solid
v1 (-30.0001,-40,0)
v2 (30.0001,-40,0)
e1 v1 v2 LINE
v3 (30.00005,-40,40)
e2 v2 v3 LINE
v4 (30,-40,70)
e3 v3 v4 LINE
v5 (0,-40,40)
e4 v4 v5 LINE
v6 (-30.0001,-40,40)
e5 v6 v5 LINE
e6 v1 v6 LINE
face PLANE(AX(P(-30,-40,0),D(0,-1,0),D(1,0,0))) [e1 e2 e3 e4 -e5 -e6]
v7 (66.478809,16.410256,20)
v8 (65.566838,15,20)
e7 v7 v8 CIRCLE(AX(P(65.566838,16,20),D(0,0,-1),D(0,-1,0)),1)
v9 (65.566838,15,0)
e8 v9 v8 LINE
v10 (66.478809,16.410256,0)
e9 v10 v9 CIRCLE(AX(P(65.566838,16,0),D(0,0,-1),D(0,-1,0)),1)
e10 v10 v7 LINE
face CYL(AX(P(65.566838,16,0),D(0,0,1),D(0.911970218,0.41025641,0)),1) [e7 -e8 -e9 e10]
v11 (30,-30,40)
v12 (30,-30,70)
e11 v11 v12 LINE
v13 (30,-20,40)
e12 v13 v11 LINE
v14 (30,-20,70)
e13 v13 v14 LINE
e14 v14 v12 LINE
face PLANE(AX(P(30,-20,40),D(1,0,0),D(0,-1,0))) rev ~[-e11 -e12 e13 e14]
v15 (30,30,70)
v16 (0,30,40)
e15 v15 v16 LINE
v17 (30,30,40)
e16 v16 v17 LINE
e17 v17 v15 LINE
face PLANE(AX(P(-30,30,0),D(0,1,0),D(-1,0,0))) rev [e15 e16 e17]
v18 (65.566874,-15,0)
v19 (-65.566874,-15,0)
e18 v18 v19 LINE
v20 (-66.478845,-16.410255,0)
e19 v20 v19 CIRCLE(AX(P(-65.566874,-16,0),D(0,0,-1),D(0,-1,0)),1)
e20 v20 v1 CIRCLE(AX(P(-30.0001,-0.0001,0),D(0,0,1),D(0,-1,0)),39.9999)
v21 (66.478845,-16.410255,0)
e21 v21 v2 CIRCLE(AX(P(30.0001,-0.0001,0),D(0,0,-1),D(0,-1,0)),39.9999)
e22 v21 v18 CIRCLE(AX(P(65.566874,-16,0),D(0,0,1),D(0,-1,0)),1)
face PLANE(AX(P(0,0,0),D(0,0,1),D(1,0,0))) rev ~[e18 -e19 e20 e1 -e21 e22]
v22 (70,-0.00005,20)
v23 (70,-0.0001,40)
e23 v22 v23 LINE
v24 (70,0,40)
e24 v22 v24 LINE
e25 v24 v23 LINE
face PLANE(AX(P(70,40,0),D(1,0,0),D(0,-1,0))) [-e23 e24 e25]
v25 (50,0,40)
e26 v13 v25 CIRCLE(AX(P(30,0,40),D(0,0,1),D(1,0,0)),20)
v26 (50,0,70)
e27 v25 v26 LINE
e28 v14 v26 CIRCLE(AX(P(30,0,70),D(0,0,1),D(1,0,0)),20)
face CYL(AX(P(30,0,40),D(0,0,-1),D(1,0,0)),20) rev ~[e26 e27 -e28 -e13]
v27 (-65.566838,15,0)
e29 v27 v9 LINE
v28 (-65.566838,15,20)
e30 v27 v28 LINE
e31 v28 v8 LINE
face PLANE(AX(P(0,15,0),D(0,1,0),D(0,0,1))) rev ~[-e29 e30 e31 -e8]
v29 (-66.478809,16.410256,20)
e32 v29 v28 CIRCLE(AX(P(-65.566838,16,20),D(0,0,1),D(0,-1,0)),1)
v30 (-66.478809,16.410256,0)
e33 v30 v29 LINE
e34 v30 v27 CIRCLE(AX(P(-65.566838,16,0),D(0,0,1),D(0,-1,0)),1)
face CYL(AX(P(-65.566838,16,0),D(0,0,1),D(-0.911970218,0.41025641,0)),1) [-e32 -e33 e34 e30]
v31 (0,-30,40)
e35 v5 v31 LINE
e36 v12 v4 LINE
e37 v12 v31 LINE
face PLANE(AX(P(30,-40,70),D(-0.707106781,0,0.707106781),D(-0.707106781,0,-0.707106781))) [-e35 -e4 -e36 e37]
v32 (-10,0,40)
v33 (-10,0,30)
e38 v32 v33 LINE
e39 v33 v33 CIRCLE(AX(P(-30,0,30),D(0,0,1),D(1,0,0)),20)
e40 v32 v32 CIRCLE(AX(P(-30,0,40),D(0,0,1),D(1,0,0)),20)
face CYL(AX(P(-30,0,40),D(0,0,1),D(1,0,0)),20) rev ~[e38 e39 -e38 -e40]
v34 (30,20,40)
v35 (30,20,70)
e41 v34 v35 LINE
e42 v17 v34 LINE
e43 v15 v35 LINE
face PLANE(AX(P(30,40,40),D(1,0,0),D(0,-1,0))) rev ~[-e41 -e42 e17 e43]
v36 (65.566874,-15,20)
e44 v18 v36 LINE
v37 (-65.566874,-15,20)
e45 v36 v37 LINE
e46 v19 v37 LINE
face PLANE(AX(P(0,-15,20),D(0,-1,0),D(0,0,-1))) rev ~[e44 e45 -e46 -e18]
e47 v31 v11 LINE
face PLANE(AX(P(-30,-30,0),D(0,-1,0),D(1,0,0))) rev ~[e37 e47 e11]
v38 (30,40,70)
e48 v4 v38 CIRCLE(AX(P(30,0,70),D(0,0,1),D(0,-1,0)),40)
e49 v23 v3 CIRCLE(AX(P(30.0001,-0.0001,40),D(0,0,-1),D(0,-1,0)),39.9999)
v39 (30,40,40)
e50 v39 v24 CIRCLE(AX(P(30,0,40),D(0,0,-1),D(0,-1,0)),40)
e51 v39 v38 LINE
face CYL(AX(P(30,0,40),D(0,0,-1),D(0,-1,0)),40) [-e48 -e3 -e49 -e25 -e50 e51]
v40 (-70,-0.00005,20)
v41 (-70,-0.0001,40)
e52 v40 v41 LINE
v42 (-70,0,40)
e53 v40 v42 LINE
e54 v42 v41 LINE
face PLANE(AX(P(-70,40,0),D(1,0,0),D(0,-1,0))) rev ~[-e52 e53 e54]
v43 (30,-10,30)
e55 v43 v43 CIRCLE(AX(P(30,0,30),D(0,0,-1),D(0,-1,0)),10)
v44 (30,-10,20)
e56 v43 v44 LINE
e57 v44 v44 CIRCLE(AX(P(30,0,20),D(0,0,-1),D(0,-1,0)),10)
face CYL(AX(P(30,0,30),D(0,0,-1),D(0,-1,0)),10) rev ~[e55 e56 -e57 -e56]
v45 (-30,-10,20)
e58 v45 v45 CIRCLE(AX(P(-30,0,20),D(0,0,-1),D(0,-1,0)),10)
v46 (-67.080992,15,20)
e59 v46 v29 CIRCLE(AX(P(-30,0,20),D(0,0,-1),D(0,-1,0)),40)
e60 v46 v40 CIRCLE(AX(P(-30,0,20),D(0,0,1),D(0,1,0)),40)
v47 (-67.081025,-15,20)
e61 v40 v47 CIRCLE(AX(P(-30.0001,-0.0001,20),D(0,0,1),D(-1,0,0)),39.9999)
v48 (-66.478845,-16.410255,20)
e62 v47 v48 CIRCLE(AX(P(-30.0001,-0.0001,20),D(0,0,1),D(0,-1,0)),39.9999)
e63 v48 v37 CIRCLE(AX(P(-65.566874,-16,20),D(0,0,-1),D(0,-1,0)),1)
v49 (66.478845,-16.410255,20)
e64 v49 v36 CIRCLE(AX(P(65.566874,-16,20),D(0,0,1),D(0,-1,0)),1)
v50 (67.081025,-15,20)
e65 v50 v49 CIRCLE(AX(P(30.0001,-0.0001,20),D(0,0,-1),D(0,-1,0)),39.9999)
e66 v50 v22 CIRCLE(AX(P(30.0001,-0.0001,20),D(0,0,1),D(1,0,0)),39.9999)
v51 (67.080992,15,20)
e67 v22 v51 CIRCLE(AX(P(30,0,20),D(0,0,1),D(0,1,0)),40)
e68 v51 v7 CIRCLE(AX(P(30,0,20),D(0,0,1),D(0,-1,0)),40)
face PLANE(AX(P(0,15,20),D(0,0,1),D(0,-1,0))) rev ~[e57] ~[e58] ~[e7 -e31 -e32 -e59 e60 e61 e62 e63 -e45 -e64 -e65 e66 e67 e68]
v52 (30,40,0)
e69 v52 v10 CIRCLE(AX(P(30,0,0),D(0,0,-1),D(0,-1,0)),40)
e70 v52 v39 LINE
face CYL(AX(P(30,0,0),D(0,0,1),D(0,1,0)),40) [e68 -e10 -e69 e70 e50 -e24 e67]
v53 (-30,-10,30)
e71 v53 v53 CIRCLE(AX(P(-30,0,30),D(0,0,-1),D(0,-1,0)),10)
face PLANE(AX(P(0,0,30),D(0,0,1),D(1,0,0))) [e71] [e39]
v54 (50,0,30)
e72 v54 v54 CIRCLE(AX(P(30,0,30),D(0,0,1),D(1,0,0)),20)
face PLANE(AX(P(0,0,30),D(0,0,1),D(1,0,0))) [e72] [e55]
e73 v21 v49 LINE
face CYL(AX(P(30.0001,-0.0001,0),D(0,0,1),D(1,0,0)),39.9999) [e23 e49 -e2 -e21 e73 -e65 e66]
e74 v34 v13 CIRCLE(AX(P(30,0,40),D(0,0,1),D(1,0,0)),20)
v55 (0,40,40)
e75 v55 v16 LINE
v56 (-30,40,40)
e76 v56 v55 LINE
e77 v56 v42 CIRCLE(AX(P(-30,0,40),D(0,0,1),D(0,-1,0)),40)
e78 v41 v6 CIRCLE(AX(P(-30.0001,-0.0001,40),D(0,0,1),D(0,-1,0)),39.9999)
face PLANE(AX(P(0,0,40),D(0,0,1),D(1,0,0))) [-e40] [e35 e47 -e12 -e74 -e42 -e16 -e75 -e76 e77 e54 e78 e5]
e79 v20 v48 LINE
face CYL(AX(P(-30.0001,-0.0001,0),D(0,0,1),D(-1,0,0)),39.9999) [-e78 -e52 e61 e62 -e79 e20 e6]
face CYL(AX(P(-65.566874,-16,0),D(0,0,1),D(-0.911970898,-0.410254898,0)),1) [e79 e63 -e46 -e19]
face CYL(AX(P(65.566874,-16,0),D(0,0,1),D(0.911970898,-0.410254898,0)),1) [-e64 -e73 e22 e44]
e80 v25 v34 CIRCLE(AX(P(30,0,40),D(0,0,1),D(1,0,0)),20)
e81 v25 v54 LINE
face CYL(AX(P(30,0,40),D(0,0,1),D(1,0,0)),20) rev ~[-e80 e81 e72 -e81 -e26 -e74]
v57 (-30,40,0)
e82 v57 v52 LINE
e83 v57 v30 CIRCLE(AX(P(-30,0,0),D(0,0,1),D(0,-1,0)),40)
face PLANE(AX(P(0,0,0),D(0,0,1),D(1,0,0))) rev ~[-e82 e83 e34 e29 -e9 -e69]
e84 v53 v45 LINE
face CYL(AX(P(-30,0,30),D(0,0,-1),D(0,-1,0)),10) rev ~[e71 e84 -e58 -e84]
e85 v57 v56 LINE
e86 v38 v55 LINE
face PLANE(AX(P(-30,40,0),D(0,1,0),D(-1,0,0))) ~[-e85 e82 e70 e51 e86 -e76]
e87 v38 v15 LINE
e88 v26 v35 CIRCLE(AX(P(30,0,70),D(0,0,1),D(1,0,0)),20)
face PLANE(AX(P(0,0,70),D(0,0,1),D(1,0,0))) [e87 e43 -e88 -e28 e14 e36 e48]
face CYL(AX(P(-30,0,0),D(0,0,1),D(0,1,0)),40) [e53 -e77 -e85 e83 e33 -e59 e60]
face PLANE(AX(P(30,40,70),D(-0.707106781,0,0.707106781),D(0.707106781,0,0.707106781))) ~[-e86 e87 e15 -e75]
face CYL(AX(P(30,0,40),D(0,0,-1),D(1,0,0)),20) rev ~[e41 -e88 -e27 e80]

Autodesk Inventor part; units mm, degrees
ref_plane "XY Plane" through (0, 0, 0) normal (0, 0, 1) x (1, 0, 0)
sketch "Skizze1" plane through (0, 0, 0) normal (0, 0, 1) x (1, 0, 0)
  line L0 (-70, 0) -> (70, 0) construction
  line L1 (-70, 40) -> (70, 40)
  line L2 (-70, -40) -> (70, -40)
  line L3 (-70, 40) -> (-70, -40)
  line L4 (70, 40) -> (70, -40)
  line L5 (0, 0) -> (0, 9.5703) construction
  dimension "d0" = 80
  dimension "d1" = 140
extrude "Extrusion1" add sketch "Skizze1" along normal blind 40
fillet "Rundung1" radius 40 1 edges at (-70, 40, 20)
fillet "Rundung2" radius 40 1 edges at (-70, -40, 20)
fillet "Rundung3" radius 40 1 edges at (70, 40, 20)
fillet "Rundung4" radius 40 1 edges at (70, -40, 20)
sketch "Skizze4" plane through (0, 0, 40) normal (0, 0, 1) x (1, 0, 0)
  circle A0 centre (-30, 0) radius 20
  circle A1 centre (30, 0) radius 20
  line L0 (0, 0) -> (0, 40) construction
  arc A2 (30, -40) -> (30, 40) centre (30, 0) ccw projected
  line L1 (30, 40) -> (-30, 40) projected
  point P0 (70, 0)
  dimension "d10" = 40
  dimension "d11" = 40
  dimension "d12" = 60
extrude "Extrusion2" cut sketch "Skizze4" against normal blind 10
sketch "Skizze5" plane through (-30, 0, 30) normal (0, 0, 1) x (1, 0, 0)
  circle A0 centre (0, 0) radius 20 projected
  point P0 (30, 0)
hole "Bohrung1" at (-30, 0, 30) direction (0, 0, -1) diameter 20 depth 30
sketch "Skizze6" plane through (30, 0, 30) normal (0, 0, 1) x (1, 0, 0)
  circle A0 centre (0, 0) radius 20 projected
  point P0 (-30, 0)
hole "Bohrung2" at (30, 0, 30) direction (0, 0, -1) diameter 20 depth 30
sketch "Skizze7" plane through (0, 0, 40) normal (0, 0, 1) x (1, 0, 0)
  circle A0 centre (30, 0) radius 10 projected
  arc A1 (30, -40) -> (30, 40) centre (30, 0) ccw projected
  line L0 (30, 40) -> (-30, 40) projected
  arc A2 (30, -40) -> (30, 40) centre (30, 0) ccw
  circle A3 centre (30, 0) radius 20 projected
  arc A4 (30, -20) -> (30, 20) centre (30, 0) ccw
  line L1 (30, 40) -> (30, 20)
  line L2 (30, -20) -> (30, -40)
  point P0 (0, 0)
extrude "Extrusion3" add sketch "Skizze7" along normal blind 30 contours L2 A3 L1 A1
sketch "Skizze8" plane through (-30, -40, 0) normal (0, -1, 0) x (1, 0, 0)
  line L0 (60, 40) -> (60, 70) projected
  line L1 (0, 40) -> (60, 40) projected
  line L2 (60, 70) -> (30, 40)
  line L3 (60, 40) -> (30, 40)
  line L4 (60, 40) -> (60, 70) projected
  line L5 (60, 70) -> (60, 40)
  point P0 (30, 0)
  dimension "d31" = 30
extrude "Extrusion4" add sketch "Skizze8" against normal blind 10
ref_plane "Arbeitsebene1" through (0, 0, 0) normal (0, -1, 0) x (1, 0, 0)
mirror "Spiegeln2" about plane through (0, 0, 0) normal (0, -1, 0) of "Extrusion4"
ref_plane "Arbeitsebene3" through (0, 0, 0) normal (-1, 0, 0) x (0, -1, 0)
sketch "Skizze10" plane through (0, 0, 0) normal (-1, 0, 0) x (0, -1, 0)
  line L0 (40, 0) -> (-40, 0) projected
  line L1 (-15, 0) -> (-15, 20)
  line L2 (-15, 20) -> (15, 20)
  line L3 (15, 20) -> (15, 0)
  line L4 (0, 0) -> (0, 10) construction
  point P0 (15, 10)
  dimension "d36" = 30
  dimension "d37" = 20
extrude "Extrusion5" cut sketch "Skizze10" along normal through all both and the other way through all
fillet "Rundung5" radius 1 4 edges at (-67.081, -15, 10) (-67.081, 15, 10) (67.081, 15, 10) (67.081, -15, 10)
properties part number "angel" material "Stahl, galvanisiert"
